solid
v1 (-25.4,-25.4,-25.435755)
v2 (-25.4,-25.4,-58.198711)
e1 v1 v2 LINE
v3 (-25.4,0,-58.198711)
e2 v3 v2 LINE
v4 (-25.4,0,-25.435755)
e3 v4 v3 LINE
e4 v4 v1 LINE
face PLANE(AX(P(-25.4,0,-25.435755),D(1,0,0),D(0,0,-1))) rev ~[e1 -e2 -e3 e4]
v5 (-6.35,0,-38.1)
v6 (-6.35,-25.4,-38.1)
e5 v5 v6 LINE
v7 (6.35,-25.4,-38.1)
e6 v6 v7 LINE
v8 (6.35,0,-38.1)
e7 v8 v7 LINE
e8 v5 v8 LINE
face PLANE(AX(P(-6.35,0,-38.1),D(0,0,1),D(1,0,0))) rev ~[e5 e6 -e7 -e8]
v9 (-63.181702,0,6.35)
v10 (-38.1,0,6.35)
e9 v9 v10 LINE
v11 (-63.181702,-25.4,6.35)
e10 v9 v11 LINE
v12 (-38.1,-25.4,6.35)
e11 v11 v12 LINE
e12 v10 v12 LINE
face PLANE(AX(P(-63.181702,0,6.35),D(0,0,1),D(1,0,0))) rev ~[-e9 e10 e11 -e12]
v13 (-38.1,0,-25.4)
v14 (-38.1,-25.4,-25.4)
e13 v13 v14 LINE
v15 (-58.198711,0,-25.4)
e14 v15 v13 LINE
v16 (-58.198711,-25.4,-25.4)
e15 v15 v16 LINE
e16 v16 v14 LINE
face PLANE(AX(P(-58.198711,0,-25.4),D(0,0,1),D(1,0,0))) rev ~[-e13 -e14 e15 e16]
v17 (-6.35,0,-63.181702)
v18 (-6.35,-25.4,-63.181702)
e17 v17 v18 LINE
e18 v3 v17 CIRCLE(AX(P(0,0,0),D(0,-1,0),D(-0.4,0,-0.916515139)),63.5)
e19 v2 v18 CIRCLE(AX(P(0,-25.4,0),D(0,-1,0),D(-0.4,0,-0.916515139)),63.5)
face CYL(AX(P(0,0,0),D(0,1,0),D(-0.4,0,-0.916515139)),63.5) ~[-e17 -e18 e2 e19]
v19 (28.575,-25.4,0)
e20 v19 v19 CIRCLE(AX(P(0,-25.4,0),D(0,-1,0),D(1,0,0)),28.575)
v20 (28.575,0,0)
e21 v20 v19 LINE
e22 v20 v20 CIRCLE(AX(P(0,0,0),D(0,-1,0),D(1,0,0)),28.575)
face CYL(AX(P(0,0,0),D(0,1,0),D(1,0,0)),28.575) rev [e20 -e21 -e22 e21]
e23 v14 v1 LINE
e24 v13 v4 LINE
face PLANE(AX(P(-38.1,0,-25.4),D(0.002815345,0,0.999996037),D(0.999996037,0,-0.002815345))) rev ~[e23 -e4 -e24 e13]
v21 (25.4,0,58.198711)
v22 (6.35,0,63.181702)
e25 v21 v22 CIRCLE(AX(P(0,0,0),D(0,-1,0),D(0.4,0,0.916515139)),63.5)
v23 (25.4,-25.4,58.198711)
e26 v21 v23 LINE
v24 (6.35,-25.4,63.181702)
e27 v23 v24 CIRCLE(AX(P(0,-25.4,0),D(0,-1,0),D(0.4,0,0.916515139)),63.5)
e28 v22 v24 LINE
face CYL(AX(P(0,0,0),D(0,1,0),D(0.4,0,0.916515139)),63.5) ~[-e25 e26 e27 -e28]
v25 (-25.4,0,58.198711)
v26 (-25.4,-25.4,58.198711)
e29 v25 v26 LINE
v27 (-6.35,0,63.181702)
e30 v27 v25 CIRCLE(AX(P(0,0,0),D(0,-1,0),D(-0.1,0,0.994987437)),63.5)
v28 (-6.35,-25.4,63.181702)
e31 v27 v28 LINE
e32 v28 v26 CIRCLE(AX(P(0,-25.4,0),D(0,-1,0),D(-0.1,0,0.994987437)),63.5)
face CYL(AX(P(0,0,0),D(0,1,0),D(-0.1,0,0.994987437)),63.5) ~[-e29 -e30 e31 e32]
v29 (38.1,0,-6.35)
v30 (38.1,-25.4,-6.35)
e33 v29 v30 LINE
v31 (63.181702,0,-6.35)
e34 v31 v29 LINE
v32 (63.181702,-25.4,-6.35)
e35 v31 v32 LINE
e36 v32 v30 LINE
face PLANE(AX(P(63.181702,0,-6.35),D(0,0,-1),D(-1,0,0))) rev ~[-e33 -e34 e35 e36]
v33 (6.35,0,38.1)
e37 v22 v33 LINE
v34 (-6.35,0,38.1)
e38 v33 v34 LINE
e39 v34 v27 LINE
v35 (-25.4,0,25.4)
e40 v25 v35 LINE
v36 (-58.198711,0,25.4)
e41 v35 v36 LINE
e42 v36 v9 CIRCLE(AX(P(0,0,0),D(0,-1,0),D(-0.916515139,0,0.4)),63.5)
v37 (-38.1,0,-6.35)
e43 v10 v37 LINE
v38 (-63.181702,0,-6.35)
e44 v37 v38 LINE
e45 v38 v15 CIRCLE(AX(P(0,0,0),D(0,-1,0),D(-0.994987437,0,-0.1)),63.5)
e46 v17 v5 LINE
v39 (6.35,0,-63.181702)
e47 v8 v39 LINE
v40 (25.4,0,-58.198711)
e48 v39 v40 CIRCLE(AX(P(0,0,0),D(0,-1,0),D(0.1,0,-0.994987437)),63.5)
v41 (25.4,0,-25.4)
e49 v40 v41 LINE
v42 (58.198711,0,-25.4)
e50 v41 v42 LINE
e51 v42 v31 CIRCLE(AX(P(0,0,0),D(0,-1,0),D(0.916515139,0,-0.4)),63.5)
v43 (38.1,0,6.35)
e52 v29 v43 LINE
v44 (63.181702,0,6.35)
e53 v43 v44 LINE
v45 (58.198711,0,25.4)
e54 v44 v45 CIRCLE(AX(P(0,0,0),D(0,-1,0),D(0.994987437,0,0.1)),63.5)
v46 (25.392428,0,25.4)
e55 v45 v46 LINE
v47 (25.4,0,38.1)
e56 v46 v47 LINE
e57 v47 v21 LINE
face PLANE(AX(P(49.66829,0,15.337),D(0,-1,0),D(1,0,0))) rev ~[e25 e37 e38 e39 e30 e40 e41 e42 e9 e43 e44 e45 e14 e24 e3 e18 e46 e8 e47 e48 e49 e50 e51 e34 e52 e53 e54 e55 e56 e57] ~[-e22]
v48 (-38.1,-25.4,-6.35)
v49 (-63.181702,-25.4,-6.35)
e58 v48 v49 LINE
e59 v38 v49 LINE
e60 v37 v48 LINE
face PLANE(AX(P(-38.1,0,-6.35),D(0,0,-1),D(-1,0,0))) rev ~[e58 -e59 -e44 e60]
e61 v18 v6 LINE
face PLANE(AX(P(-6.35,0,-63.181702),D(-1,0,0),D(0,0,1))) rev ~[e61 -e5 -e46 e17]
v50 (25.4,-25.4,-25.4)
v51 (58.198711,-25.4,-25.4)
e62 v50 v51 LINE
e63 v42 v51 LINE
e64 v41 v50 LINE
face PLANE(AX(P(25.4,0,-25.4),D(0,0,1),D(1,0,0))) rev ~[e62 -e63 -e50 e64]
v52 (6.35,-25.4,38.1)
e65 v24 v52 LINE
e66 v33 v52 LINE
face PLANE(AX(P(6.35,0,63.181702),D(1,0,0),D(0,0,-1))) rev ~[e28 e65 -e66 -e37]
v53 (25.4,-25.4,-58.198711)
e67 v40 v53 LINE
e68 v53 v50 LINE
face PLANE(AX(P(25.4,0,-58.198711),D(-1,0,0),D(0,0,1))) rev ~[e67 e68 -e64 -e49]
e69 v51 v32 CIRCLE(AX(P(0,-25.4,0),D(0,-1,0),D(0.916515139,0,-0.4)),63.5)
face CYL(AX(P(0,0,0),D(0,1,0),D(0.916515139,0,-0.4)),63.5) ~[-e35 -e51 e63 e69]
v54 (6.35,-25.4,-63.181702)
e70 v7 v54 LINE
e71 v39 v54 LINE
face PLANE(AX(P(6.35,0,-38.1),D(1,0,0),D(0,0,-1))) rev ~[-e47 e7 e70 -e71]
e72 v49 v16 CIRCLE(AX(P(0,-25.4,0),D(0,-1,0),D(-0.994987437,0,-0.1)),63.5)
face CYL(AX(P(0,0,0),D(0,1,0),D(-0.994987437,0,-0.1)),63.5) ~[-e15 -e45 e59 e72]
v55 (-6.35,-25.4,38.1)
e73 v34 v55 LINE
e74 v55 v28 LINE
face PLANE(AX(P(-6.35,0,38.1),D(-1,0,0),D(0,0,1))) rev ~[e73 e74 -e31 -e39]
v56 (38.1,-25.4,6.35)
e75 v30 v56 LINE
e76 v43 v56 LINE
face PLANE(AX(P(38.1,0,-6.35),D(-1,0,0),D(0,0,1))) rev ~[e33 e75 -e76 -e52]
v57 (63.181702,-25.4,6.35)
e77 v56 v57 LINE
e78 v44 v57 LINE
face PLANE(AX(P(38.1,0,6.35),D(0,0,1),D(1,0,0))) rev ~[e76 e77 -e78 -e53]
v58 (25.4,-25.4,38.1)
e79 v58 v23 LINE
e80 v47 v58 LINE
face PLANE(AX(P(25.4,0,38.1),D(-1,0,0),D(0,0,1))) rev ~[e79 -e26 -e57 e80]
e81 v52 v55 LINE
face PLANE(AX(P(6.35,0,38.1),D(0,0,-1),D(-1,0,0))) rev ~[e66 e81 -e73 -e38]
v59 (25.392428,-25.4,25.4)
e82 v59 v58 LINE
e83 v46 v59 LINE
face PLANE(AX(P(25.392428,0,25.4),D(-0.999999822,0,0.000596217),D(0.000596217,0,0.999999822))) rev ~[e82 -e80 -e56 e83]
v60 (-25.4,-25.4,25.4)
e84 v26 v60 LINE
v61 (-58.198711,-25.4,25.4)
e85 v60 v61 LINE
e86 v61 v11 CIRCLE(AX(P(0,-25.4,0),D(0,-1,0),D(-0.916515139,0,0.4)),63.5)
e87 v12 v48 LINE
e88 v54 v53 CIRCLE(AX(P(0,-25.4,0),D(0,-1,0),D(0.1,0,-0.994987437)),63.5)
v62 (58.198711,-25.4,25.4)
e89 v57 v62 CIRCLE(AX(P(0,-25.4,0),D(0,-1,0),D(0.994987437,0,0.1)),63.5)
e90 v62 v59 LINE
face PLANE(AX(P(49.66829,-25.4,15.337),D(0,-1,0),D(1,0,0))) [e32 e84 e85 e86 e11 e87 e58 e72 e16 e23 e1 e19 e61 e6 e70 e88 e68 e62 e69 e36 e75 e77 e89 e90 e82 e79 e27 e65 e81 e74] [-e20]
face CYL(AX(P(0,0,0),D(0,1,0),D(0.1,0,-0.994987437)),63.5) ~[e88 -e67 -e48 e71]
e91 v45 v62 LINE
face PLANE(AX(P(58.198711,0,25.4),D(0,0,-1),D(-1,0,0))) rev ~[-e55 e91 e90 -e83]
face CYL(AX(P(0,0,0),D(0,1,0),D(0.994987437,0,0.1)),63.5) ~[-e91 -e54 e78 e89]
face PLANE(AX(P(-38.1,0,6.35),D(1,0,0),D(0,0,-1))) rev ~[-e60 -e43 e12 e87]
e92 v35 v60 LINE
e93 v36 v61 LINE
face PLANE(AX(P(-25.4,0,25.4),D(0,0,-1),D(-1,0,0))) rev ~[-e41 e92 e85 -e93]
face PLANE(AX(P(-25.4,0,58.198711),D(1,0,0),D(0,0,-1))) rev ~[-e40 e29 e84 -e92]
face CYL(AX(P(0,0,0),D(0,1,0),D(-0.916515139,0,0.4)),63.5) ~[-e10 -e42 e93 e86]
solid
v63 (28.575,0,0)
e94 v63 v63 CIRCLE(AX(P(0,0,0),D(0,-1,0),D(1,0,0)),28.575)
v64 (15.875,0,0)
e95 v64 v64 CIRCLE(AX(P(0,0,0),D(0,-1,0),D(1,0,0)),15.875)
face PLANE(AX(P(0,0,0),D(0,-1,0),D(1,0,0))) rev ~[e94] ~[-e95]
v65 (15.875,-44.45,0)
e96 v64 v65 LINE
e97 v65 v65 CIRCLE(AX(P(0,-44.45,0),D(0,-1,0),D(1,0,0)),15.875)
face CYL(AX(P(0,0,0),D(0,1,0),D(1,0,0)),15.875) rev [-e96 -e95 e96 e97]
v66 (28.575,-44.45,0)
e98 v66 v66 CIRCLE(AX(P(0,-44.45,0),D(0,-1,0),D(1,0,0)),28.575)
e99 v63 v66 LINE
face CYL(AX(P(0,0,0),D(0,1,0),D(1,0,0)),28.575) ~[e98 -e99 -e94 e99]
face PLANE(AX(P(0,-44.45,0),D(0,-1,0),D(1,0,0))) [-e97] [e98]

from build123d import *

# Parameters (mm, degrees)
F0_R     = 28.575
F1_DEPTH = 25.4
F0_R_2   = 15.875
F2_DEPTH = 44.45


# Not quite as in the source:
# - a feature names something its author has since deleted; it is built from what else it names


with BuildPart() as f1:
    # F0 (on Front) → F1 (new body)
    with BuildSketch(Plane.XZ):
        with BuildLine():
            Line((58.1987113259, 25.4), (38.1, 25.4))
            Line((38.1, 25.4), (38.1, 6.35))
            Line((38.1, 6.35), (63.1817022563, 6.35))
            ThreePointArc((63.1817022563, 6.35), (61.4331085437, 16.069324026), (58.1987113259, 25.4))
        make_face()
        with BuildLine():
            Line((63.1817022563, -6.35), (38.1, -6.35))
            Line((38.1, -6.35), (38.1, -25.4))
            Line((38.1, -25.4), (58.1987113259, -25.4))
            ThreePointArc((58.1987113259, -25.4), (61.4331085437, -16.069324026), (63.1817022563, -6.35))
        make_face()
        with BuildLine():
            Line((25.4, -58.1987113259), (25.4, -38.1))
            Line((25.4, -38.1), (6.35, -38.1))
            Line((6.35, -38.1), (6.35, -63.1817022563))
            ThreePointArc((6.35, -63.1817022563), (16.069324026, -61.4331085437), (25.4, -58.1987113259))
        make_face()
        with BuildLine():
            Line((-6.35, -63.1817022563), (-6.35, -38.1))
            Line((-6.35, -38.1), (-25.4, -38.1))
            Line((-25.4, -38.1), (-25.4, -58.1987113259))
            ThreePointArc((-25.4, -58.1987113259), (-16.069324026, -61.4331085437), (-6.35, -63.1817022563))
        make_face()
        with BuildLine():
            Line((-38.1, -25.4), (-38.1, -6.35))
            Line((-38.1, -6.35), (-63.1817022563, -6.35))
            ThreePointArc((-63.1817022563, -6.35), (-61.4331085437, -16.069324026), (-58.1987113259, -25.4))
            Line((-58.1987113259, -25.4), (-38.1, -25.4))
        make_face()
        with BuildLine():
            Line((6.35, 38.1), (25.4, 38.1))
            Line((25.4, 38.1), (25.4, 58.1987113259))
            ThreePointArc((25.4, 58.1987113259), (16.069324026, 61.4331085437), (6.35, 63.1817022563))
            Line((6.35, 63.1817022563), (6.35, 38.1))
        make_face()
        with BuildLine():
            Line((-25.4, 38.1), (-6.35, 38.1))
            Line((-6.35, 38.1), (-6.35, 63.1817022563))
            ThreePointArc((-6.35, 63.1817022563), (-16.069324026, 61.4331085437), (-25.4, 58.1987113259))
            Line((-25.4, 58.1987113259), (-25.4, 38.1))
        make_face()
        Polygon((25.3924280405, 25.4), (25.4, 38.1), (6.35, 38.1), (-6.35, 38.1), (-25.4, 38.1), (-25.4, 25.4), (-38.1, 25.4), (-38.1, 13.6643098667), (-38.1, 6.35), (-38.1, -6.35), (-38.1, -25.4), (-25.4, -25.4357550293), (-25.4, -38.1), (-6.35, -38.1), (6.35, -38.1), (25.4, -38.1), (25.4, -25.4), (38.1, -25.4), (38.1, -6.35), (38.1, 6.35), (38.1, 25.4), align=None)
        Circle(F0_R, mode=Mode.SUBTRACT)
        with BuildLine():
            Line((-38.1, 13.6643098667), (-38.1, 25.4))
            Line((-38.1, 25.4), (-58.1987113259, 25.4))
            ThreePointArc((-58.1987113259, 25.4), (-61.4331085437, 16.069324026), (-63.1817022563, 6.35))
            Line((-63.1817022563, 6.35), (-38.1, 6.35))
            Line((-38.1, 6.35), (-38.1, 13.6643098667))
        make_face()
    extrude(amount=F1_DEPTH)


with BuildPart() as f2:
    # F0 (on Front) → F2 (new body)
    with BuildSketch(Plane.XZ):
        Circle(F0_R)
        Circle(F0_R_2, mode=Mode.SUBTRACT)
    extrude(amount=F2_DEPTH)


solid = Compound([f1.part, f2.part])
